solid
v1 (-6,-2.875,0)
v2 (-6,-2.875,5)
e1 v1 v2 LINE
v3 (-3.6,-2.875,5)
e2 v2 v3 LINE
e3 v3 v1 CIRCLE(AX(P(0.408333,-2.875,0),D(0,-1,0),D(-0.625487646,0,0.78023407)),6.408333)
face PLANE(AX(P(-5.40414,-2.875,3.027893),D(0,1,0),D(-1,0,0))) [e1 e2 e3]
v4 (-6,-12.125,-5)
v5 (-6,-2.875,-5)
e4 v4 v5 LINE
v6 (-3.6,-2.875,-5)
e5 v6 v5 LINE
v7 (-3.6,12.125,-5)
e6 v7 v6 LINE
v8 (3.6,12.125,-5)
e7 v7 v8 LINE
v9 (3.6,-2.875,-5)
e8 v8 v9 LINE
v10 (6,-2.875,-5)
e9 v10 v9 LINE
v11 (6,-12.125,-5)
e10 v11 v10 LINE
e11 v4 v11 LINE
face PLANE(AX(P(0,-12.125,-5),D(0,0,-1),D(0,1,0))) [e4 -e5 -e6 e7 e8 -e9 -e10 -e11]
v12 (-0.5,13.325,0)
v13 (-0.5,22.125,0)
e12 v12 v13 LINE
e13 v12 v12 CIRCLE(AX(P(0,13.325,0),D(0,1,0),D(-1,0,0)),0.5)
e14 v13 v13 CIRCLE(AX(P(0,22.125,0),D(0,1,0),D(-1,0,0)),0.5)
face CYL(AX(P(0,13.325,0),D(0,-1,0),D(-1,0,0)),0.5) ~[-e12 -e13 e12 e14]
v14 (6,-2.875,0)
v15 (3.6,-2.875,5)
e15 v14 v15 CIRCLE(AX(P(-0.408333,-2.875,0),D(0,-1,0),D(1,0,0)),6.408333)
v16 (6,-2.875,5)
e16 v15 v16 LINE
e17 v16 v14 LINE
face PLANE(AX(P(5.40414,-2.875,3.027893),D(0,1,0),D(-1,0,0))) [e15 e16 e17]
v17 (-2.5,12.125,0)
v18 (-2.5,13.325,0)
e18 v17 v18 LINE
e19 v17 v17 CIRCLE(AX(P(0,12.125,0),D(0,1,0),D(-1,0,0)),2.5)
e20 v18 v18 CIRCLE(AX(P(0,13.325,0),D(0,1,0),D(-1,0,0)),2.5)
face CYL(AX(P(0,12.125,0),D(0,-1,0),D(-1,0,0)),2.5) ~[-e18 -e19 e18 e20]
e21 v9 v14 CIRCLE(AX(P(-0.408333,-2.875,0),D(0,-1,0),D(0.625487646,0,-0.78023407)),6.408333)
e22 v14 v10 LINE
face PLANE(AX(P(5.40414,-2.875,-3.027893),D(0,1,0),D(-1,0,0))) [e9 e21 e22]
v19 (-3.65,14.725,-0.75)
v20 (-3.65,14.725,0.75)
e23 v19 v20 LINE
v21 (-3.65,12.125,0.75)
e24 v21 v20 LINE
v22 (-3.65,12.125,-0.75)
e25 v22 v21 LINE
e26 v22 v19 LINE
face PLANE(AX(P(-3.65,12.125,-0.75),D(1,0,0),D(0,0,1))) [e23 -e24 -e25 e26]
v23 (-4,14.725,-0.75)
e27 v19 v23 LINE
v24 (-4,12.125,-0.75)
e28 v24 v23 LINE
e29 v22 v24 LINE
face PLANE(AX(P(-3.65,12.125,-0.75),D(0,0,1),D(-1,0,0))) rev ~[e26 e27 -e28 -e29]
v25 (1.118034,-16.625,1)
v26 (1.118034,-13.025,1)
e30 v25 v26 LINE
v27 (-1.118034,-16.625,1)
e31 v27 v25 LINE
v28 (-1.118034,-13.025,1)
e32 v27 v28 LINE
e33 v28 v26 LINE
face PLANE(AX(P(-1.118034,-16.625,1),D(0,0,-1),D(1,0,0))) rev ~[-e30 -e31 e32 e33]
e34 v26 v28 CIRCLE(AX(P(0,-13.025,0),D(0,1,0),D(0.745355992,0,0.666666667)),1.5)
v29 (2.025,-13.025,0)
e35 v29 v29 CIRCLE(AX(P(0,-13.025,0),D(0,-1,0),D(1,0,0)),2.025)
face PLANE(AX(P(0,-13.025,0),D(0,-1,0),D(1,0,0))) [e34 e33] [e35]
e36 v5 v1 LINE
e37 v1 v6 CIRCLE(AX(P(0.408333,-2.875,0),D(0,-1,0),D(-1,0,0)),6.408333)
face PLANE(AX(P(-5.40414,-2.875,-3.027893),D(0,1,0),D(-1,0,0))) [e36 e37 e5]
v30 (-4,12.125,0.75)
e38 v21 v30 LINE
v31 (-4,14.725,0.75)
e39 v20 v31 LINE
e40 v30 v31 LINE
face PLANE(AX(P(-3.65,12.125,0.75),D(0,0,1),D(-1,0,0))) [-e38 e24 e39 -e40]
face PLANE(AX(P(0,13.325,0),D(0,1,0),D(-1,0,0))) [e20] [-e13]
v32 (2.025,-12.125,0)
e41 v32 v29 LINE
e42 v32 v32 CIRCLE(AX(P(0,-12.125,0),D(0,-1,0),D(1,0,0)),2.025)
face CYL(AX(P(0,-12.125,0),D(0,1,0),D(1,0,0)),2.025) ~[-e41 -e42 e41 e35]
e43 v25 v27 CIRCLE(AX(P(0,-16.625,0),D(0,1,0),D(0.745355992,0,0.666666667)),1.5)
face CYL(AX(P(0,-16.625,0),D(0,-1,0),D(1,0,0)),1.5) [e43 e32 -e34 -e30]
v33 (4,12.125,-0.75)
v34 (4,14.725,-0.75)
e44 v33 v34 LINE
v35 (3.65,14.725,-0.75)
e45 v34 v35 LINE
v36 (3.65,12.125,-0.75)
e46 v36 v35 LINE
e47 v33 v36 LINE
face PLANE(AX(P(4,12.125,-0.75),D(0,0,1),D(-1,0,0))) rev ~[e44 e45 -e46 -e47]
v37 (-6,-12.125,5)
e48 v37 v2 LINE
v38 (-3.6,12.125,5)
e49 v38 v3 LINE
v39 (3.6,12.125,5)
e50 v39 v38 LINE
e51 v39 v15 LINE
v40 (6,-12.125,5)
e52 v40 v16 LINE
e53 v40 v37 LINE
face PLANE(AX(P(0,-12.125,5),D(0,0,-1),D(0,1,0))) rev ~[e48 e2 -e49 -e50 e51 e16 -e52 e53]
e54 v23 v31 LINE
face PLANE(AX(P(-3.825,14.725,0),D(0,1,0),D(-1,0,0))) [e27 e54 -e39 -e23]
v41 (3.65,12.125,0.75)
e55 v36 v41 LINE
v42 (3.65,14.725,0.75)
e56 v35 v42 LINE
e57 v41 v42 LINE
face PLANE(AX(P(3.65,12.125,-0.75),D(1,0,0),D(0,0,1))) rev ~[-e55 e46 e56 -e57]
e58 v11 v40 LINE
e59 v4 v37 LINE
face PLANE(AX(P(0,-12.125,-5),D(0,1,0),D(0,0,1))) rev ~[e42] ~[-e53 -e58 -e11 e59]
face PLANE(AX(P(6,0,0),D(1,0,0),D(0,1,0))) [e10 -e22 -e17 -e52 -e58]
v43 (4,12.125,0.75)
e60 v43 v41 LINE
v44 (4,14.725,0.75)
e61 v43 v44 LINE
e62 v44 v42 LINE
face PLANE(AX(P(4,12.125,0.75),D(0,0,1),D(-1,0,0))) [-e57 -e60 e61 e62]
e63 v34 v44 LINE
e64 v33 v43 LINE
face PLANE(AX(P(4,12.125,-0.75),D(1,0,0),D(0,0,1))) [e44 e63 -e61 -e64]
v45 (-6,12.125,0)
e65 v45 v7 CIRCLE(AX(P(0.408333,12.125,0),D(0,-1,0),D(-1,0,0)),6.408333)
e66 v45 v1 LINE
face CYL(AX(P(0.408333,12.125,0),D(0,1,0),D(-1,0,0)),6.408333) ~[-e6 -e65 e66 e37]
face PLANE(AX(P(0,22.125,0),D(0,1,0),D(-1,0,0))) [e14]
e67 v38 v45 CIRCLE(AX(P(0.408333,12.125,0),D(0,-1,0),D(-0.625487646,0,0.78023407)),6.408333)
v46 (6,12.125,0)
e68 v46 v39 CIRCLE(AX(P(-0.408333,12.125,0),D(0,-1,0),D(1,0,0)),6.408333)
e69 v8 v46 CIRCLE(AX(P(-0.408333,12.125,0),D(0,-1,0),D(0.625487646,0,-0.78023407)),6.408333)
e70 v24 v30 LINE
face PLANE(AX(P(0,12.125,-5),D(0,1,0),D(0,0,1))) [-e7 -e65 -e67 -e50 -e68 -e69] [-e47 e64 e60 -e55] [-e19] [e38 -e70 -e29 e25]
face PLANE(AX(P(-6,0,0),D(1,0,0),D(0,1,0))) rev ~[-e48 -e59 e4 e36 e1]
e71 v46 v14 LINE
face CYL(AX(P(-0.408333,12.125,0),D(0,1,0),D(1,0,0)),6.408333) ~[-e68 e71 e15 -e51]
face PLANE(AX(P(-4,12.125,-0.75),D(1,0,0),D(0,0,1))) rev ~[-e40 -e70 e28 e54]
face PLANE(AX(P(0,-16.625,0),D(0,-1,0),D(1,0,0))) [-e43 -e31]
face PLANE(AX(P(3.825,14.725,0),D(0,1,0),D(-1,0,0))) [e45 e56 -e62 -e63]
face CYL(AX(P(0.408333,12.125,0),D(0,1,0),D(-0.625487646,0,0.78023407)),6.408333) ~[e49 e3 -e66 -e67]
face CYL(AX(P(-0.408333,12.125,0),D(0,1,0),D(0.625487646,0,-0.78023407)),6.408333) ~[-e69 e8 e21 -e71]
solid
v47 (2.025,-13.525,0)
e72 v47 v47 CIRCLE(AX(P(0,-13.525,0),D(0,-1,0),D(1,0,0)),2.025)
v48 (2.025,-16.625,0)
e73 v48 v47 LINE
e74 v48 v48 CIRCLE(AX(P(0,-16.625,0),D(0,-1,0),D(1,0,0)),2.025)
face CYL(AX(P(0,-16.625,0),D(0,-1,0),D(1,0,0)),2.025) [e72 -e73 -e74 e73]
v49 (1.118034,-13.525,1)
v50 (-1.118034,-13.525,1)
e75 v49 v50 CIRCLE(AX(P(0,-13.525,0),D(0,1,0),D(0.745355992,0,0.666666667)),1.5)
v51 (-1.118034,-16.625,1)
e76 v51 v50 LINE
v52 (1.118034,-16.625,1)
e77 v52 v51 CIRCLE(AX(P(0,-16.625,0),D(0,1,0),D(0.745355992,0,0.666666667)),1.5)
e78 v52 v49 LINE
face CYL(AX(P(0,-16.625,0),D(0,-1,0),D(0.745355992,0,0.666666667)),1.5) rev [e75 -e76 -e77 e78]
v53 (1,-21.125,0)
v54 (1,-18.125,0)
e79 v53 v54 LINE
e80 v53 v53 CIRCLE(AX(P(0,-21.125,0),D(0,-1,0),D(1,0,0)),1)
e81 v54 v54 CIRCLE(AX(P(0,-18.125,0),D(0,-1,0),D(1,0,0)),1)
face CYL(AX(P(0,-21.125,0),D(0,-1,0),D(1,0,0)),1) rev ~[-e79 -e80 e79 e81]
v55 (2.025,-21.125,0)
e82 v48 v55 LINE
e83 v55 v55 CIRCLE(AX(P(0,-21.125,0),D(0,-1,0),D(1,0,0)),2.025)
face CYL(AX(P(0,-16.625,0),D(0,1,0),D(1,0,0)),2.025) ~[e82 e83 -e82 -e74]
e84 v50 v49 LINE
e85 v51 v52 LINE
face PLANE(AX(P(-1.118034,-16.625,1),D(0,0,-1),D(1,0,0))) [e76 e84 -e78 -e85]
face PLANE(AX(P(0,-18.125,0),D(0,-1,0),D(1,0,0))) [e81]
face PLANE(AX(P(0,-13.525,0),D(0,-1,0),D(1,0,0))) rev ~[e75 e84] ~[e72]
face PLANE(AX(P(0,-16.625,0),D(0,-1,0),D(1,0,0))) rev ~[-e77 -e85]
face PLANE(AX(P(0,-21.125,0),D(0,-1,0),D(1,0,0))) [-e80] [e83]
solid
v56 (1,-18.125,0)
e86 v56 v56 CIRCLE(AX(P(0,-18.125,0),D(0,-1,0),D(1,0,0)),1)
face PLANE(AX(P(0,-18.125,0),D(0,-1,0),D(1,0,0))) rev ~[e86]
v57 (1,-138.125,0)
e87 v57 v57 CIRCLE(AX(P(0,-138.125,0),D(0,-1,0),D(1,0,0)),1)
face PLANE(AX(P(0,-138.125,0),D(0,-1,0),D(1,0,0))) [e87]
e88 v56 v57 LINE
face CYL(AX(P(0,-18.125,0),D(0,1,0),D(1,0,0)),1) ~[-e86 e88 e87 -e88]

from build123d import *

# Parameters (mm, degrees)
F0_W      = 24.25
F0_H      = 10
F1_DEPTH  = 6
F3_DEPTH  = 15
F4_R      = 2.025
F5_DEPTH  = 4.5
F6_R      = 2.025
F6_R_2    = 1.5
F7_DEPTH  = 3.6
F9_DEPTH  = 3.6
F10_R     = 2.5
F11_DEPTH = 1.2
F12_W     = 0.35
F12_H     = 1.5
F13_DEPTH = 2.6
F14_R     = 0.5
F15_DEPTH = 8.8
F16_R     = 2.025
F17_DEPTH = 3.1
F18_R     = 2.025
F19_DEPTH = 4.5
F20_R     = 1
F21_DEPTH = 3
F22_DEPTH = 120


with BuildPart() as f1:
    # F0 (on Right) → F1 (new body, symmetric)
    with BuildSketch(Plane.YZ):
        Rectangle(F0_W, F0_H)
    extrude(amount=F1_DEPTH, both=True)

    # F2 (on face) → F3 (cut)
    with BuildSketch(Plane(origin=(0, 12.125, 0), x_dir=(-1, 0, 0), z_dir=(0, 1, 0))):
        with BuildLine():
            ThreePointArc((-3.6, -5), (-5.3689269262, -2.7730849257), (-6, -2.1e-09))
            Line((-6, -2.1e-09), (-6, -5))
            Line((-6, -5), (-3.6, -5))
        make_face()
        with BuildLine():
            ThreePointArc((-6, -2.1e-09), (-5.3689269271, 2.7730849238), (-3.6, 5))
            Line((-3.6, 5), (-6, 5))
            Line((-6, 5), (-6, -2.1e-09))
        make_face()
        with BuildLine():
            ThreePointArc((3.6, 5), (5.3689269271, 2.7730849238), (6, -2.1e-09))
            Line((6, -2.1e-09), (6, 5))
            Line((6, 5), (3.6, 5))
        make_face()
        with BuildLine():
            Line((3.6, -5), (6, -5))
            Line((6, -5), (6, -2.1e-09))
            ThreePointArc((6, -2.1e-09), (5.3689269262, -2.7730849257), (3.6, -5))
        make_face()
    extrude(amount=-F3_DEPTH, mode=Mode.SUBTRACT)

    # F4 (on face) → F5 (join)
    with BuildSketch(Plane.XZ.offset(12.125)):
        Circle(F4_R)
    extrude(amount=F5_DEPTH)

    # F6 (on face) → F7 (cut)
    with BuildSketch(Plane.XZ.offset(16.625)):
        Circle(F6_R)
        Circle(F6_R_2, mode=Mode.SUBTRACT)
    extrude(amount=-F7_DEPTH, mode=Mode.SUBTRACT)

    # F8 (on face) → F9 (cut, through all)
    with BuildSketch(Plane.XZ.offset(16.625)):
        with BuildLine():
            ThreePointArc((1.1180339887, 1), (0, 1.5), (-1.1180339887, 1))
            Line((-1.1180339887, 1), (1.1180339887, 1))
        make_face()
    extrude(amount=-F9_DEPTH, mode=Mode.SUBTRACT)

    # F10 (on face) → F11 (join)
    with BuildSketch(Plane(origin=(0, 12.125, 0), x_dir=(-1, 0, 0), z_dir=(0, 1, 0))):
        Circle(F10_R)
    extrude(amount=F11_DEPTH)

    # F12 (on face) → F13 (join)
    with BuildSketch(Plane(origin=(0, 12.125, 0), x_dir=(-1, 0, 0), z_dir=(0, 1, 0))):
        with Locations((-3.825, 0)):
            Rectangle(F12_W, F12_H)
        with Locations((3.825, 0)):
            Rectangle(F12_W, F12_H)
    extrude(amount=F13_DEPTH)

    # F14 (on face) → F15 (join)
    with BuildSketch(Plane(origin=(0, 13.325, 0), x_dir=(-1, 0, 0), z_dir=(0, 1, 0))):
        Circle(F14_R)
    extrude(amount=F15_DEPTH)


with BuildPart() as f17:
    # F16 (on face) → F17 (new body)
    with BuildSketch(Plane.XZ.offset(16.625)):
        Circle(F16_R)
        with BuildLine():
            ThreePointArc((1.1180339887, 1), (0, -1.5), (-1.1180339887, 1))
            Line((-1.1180339887, 1), (1.1180339887, 1))
        make_face(mode=Mode.SUBTRACT)
    extrude(amount=-F17_DEPTH)

    # F18 (on face) → F19 (join)
    with BuildSketch(Plane.XZ.offset(16.625)):
        Circle(F18_R)
    extrude(amount=F19_DEPTH)

    # F20 (on face) → F21 (cut)
    with BuildSketch(Plane.XZ.offset(21.125)):
        Circle(F20_R)
    extrude(amount=-F21_DEPTH, mode=Mode.SUBTRACT)


with BuildPart() as f22:
    # F22 (new): a face of the model
    f22_faces = [f17.part.faces().sort_by_distance(p)[0] for p in [
        (0, -18.125, 0),
    ]]
    extrude(f22_faces, amount=F22_DEPTH)


solid = Compound([f1.part, f17.part, f22.part])
